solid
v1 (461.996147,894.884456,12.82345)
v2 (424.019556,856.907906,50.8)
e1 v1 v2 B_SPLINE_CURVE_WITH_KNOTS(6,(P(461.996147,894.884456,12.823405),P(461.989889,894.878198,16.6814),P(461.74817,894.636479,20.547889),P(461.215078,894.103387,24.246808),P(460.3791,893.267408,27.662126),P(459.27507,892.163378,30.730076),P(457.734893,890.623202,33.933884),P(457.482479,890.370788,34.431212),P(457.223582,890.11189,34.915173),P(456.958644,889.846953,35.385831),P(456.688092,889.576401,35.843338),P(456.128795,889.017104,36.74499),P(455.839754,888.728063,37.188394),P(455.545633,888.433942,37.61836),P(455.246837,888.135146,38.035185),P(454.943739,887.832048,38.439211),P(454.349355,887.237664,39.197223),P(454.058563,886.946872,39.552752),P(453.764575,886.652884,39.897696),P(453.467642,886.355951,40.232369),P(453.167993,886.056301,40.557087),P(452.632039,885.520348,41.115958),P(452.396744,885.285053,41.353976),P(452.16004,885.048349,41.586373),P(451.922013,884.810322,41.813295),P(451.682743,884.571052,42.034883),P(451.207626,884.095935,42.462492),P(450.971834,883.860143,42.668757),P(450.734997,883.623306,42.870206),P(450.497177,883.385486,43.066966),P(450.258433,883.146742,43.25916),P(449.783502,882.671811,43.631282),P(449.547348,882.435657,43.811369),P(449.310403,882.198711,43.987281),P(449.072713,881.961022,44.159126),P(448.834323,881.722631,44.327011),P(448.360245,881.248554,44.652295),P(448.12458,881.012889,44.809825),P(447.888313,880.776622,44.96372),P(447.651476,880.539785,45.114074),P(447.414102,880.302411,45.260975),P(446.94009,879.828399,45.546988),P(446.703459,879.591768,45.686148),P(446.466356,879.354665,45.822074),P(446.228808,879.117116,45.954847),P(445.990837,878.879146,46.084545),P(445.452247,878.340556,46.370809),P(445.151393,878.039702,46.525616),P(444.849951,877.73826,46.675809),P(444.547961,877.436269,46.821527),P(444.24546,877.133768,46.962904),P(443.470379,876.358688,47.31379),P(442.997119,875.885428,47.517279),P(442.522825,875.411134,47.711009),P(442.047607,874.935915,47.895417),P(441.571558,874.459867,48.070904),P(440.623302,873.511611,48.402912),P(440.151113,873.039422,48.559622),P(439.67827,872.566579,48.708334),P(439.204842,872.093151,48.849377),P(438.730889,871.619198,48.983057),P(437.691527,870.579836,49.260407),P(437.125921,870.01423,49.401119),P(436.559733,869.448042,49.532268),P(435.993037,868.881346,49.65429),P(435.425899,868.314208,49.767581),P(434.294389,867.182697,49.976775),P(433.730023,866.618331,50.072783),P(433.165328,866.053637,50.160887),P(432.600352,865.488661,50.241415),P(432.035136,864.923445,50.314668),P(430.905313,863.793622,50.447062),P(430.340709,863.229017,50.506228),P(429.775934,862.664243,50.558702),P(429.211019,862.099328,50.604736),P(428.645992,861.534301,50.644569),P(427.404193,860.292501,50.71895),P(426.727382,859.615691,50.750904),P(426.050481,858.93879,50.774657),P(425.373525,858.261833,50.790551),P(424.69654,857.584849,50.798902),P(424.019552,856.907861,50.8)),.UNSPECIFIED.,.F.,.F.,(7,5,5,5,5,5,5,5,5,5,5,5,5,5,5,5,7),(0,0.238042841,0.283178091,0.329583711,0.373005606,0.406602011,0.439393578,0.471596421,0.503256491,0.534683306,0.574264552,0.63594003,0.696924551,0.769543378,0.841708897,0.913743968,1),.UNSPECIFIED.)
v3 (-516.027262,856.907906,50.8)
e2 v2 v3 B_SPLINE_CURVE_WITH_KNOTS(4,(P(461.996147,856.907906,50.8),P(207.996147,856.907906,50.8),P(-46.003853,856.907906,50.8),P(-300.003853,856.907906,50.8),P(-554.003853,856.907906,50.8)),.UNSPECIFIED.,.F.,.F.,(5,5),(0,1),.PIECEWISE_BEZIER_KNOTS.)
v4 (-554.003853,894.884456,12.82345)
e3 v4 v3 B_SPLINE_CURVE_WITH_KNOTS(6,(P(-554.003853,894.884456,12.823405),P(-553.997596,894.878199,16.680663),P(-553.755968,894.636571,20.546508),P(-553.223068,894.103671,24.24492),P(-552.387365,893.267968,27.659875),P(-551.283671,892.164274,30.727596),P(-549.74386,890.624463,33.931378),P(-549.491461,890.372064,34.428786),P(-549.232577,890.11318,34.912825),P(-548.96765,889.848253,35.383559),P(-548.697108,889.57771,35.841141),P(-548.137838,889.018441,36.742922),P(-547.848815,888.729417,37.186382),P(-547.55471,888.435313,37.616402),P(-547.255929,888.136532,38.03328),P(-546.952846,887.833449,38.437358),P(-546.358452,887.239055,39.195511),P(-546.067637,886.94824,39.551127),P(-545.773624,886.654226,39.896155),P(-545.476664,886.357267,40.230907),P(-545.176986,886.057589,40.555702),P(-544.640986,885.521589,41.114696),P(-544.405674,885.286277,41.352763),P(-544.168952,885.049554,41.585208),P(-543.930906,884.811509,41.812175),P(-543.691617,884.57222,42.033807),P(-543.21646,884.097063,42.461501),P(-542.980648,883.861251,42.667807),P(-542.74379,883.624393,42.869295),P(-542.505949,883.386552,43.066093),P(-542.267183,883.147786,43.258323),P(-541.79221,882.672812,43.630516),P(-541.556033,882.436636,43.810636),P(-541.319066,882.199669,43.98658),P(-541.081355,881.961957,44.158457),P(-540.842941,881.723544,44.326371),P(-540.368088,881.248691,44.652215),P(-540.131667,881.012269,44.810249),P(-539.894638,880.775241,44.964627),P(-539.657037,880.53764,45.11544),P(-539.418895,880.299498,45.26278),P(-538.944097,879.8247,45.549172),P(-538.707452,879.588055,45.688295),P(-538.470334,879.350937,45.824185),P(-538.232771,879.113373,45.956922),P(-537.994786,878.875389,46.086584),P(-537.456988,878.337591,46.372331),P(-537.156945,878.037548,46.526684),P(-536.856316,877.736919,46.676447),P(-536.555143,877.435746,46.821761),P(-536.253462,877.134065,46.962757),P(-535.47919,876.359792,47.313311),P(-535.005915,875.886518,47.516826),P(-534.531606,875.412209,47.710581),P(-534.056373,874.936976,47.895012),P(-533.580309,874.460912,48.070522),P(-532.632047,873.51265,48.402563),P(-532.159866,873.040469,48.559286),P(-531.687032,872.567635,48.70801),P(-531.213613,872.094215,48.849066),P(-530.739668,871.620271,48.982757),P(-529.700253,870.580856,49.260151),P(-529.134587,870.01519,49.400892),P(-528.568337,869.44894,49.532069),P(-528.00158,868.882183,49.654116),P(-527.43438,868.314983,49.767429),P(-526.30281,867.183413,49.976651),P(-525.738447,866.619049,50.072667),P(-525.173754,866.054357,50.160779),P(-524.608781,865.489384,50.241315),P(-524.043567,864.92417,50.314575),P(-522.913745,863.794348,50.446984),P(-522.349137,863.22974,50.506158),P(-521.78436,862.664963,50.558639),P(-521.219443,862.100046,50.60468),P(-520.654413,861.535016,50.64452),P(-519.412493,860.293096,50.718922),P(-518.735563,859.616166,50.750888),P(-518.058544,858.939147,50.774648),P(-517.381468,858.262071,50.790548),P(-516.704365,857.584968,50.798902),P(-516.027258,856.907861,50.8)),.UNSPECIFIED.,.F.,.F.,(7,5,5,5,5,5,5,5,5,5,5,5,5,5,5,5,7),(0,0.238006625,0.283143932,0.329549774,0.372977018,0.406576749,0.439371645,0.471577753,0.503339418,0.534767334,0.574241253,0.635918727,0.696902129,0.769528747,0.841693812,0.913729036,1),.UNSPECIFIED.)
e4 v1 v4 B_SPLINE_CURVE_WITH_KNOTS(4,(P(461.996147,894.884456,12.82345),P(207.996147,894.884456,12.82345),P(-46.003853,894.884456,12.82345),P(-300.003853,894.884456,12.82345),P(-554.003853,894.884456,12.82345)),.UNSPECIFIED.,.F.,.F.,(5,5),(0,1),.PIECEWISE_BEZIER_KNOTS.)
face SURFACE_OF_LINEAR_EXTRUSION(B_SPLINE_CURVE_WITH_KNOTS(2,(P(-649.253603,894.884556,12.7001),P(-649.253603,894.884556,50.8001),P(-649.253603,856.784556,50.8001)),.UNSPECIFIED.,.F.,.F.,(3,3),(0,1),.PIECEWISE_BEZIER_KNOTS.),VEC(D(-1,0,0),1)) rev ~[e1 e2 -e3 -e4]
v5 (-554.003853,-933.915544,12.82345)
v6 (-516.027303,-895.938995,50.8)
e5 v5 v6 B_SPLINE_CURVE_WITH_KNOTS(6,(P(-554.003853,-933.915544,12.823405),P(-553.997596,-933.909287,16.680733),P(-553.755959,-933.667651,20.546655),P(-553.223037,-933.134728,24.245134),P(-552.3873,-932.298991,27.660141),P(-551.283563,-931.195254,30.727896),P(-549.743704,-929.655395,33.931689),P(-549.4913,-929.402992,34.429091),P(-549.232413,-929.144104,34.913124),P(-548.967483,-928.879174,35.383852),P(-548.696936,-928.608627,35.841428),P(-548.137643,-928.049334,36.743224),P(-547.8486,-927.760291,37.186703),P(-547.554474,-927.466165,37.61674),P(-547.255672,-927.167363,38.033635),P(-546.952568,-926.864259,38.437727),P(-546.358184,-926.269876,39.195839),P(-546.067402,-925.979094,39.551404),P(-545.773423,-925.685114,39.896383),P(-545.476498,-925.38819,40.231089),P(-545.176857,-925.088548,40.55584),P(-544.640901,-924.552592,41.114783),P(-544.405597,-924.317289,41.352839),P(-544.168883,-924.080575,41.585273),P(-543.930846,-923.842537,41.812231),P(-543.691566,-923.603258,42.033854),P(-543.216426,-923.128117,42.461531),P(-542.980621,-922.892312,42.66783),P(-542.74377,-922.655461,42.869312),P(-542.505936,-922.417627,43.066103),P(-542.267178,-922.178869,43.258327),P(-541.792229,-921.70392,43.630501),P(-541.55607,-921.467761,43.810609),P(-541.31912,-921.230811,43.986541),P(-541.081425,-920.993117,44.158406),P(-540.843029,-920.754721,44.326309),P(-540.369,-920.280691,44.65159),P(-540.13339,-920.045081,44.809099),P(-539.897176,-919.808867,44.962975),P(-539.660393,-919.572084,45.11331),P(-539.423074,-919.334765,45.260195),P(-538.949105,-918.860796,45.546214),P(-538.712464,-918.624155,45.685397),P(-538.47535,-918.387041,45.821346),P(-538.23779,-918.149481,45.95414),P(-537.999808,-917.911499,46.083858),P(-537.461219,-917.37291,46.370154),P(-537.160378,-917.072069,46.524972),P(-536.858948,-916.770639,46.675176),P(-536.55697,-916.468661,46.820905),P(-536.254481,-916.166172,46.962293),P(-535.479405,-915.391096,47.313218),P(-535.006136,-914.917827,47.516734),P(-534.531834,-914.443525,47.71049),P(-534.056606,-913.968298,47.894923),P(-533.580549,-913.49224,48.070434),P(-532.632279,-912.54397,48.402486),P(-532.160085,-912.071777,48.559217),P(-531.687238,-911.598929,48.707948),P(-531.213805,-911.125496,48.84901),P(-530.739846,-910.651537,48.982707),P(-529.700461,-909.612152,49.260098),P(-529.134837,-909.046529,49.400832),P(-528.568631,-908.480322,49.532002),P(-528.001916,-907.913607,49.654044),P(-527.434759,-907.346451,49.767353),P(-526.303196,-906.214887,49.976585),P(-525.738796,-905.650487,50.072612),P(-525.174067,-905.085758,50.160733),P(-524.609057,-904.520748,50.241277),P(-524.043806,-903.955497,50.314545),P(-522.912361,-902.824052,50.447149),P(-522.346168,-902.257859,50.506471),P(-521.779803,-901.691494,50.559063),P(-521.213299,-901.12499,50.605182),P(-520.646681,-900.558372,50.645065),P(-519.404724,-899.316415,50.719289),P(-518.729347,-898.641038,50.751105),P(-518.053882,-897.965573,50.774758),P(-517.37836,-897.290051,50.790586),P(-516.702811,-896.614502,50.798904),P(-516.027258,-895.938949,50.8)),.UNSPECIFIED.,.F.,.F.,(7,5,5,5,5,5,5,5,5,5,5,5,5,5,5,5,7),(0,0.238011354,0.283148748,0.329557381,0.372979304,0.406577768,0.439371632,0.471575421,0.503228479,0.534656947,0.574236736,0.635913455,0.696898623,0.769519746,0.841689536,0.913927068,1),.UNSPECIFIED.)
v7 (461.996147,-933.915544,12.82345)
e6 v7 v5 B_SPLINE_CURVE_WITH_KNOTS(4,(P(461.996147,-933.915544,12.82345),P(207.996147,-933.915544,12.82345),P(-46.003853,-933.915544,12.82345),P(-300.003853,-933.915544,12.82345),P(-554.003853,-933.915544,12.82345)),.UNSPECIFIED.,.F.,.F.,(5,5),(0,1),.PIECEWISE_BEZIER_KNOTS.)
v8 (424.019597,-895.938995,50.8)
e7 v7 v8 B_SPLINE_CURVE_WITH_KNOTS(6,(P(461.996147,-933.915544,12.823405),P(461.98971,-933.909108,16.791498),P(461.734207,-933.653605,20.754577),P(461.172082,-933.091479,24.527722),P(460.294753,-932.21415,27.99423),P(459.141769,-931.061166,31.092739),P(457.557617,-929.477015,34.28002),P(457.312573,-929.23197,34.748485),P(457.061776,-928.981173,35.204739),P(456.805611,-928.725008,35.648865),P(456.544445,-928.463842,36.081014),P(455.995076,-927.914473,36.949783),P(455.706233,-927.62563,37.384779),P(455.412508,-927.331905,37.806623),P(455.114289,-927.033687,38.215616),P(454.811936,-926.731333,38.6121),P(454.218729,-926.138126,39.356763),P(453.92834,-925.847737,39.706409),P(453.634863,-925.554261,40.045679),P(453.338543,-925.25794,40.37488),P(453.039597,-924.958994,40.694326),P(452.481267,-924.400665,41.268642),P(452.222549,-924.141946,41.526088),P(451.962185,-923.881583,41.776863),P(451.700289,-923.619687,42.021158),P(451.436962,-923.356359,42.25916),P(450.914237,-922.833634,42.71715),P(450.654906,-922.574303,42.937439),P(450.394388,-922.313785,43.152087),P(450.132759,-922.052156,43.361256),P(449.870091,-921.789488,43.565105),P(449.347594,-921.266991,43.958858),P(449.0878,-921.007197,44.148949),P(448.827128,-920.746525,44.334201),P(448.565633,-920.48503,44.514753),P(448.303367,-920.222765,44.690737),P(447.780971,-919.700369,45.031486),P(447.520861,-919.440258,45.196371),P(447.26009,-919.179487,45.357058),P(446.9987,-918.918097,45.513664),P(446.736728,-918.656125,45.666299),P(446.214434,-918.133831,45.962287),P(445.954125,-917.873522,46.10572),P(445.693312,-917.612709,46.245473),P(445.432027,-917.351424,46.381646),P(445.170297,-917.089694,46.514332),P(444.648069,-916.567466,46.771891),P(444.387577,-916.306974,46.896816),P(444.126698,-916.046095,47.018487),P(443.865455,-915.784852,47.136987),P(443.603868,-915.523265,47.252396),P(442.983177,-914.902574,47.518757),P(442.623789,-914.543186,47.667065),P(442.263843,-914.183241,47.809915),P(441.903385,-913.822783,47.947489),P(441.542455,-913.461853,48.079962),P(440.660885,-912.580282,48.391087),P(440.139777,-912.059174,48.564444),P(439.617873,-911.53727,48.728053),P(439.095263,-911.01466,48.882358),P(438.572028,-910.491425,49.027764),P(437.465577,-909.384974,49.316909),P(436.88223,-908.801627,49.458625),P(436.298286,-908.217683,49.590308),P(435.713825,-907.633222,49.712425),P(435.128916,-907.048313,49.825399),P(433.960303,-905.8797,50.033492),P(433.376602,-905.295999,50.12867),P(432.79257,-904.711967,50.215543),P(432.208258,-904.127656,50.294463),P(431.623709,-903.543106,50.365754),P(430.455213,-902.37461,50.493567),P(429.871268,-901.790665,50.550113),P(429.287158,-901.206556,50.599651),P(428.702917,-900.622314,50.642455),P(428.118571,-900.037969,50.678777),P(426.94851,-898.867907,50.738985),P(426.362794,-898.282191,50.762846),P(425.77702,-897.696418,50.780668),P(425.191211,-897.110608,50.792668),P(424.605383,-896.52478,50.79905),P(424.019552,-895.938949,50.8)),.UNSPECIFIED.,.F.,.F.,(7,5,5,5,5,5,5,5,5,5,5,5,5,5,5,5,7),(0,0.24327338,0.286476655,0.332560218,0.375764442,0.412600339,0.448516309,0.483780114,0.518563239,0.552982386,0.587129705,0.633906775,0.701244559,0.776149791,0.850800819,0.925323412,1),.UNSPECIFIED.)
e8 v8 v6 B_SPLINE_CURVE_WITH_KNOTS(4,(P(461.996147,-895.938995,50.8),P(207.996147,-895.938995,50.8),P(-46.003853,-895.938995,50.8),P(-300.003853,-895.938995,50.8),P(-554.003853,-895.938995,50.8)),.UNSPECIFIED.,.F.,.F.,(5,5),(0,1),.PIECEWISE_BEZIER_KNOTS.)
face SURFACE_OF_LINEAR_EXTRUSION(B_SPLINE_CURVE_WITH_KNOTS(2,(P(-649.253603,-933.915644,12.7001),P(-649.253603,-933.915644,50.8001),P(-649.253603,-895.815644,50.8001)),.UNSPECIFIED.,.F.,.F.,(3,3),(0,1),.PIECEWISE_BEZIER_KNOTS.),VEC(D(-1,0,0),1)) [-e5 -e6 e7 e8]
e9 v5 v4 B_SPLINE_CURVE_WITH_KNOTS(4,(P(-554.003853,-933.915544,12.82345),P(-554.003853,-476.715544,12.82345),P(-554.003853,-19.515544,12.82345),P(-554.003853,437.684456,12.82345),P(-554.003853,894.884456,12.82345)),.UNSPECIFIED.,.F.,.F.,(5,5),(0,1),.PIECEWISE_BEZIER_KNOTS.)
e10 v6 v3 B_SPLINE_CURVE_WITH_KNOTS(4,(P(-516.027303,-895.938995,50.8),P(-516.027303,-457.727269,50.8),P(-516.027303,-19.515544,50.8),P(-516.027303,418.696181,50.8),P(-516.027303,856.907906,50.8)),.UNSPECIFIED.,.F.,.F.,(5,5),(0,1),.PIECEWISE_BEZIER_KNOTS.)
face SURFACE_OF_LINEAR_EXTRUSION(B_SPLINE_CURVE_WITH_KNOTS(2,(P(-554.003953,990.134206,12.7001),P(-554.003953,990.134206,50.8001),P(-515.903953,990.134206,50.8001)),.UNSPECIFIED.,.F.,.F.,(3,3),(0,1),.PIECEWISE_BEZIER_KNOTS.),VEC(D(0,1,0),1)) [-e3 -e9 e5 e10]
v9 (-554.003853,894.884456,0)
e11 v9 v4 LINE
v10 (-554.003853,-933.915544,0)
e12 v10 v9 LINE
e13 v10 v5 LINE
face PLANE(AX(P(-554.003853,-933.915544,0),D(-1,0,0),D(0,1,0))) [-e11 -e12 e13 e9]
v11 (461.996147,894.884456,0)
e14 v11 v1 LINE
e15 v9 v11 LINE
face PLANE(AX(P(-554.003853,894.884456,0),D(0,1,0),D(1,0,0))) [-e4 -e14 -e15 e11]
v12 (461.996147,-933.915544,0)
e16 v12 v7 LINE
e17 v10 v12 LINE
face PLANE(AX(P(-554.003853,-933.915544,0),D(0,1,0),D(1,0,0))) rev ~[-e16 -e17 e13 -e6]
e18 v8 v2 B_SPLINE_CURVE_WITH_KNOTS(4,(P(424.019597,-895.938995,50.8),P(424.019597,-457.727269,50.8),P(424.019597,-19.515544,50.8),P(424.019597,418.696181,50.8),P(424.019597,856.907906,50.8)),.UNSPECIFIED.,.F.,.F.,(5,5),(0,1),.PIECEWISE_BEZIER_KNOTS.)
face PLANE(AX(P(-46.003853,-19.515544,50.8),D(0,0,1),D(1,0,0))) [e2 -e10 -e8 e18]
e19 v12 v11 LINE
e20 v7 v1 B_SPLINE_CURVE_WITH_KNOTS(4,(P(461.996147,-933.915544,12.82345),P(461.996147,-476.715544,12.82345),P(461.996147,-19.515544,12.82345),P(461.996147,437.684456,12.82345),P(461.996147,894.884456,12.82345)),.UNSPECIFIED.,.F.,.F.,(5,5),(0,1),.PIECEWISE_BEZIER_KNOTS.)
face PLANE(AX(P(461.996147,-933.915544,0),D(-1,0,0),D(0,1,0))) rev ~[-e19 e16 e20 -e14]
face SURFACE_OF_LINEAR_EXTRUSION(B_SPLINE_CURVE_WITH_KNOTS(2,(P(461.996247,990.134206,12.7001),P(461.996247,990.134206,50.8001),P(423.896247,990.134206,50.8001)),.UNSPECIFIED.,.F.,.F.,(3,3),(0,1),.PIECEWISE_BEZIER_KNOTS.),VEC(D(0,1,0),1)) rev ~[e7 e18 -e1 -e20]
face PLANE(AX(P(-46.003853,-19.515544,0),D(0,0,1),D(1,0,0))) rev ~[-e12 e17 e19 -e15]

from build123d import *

# Parameters (mm, degrees)
F0_W        = 1016
F0_H        = 1828.8
F1_DEPTH    = 50.8
F2_T1_DEPTH = 1206.4995000007
F2_T3_DEPTH = 2019.2995000007


# Not quite as in the source:
# - a fillet or chamfer that OpenCascade refuses, or shapes differently, is made with other operations: its cross-section is extruded or revolved along the edge and cut away or added


with BuildPart() as f1:
    # F0 (on Top) → F1 (new body)
    with BuildSketch(Plane.XY):
        with Locations((-46.0038529815, -19.5155441761)):
            Rectangle(F0_W, F0_H)
    extrude(amount=F1_DEPTH)

    # F2: fillet of radius 38.1 on 4 edges, made by hand

    # F2_s2 → F2_t1 (cut)
    with BuildSketch(Plane.YZ.offset(-649.2536029818)):
        with BuildLine():
            add(Edge.make_bspline(
                [(-933.9156441761, 12.7001), (-933.9156441761, 50.8001), (-895.8156441761, 50.8001)],
                knots=[0, 0, 0, 1, 1, 1], degree=2, weights=[1, 1, 1]))
            Line((-895.8156441761, 50.8001), (-895.8156441761, 51.5621))
            ThreePointArc((-895.8156441761, 51.5621), (-914.8655941761, 51.562), (-933.9155441761, 51.562))
            Line((-933.9155441761, 51.562), (-934.6775441761, 50.8))
            ThreePointArc((-934.6775441761, 50.8), (-934.6775441761, 31.75005), (-934.6776441761, 12.7001))
            Line((-934.6776441761, 12.7001), (-933.9156441761, 12.7001))
        make_face()
        with BuildLine():
            add(Edge.make_bspline(
                [(894.8845558239, 12.7001), (894.8845558239, 50.8001), (856.7845558239, 50.8001)],
                knots=[0, 0, 0, 1, 1, 1], degree=2, weights=[1, 1, 1]))
            Line((856.7845558239, 50.8001), (856.7845558239, 51.5621))
            ThreePointArc((856.7845558239, 51.5621), (875.8345058239, 51.562), (894.8844558239, 51.562))
            Line((894.8844558239, 51.562), (895.6464558239, 50.8))
            ThreePointArc((895.6464558239, 50.8), (895.6464558239, 31.75005), (895.6465558239, 12.7001))
            Line((895.6465558239, 12.7001), (894.8845558239, 12.7001))
        make_face()
    extrude(amount=F2_T1_DEPTH, mode=Mode.SUBTRACT)

    # F2_s4 → F2_t3 (cut)
    with BuildSketch(Plane.XZ.offset(-990.1342058242)):
        with BuildLine():
            add(Edge.make_bspline(
                [(461.9962470185, 12.7001), (461.9962470185, 50.8001), (423.8962470185, 50.8001)],
                knots=[0, 0, 0, 1, 1, 1], degree=2, weights=[1, 1, 1]))
            Line((423.8962470185, 50.8001), (423.8962470185, 51.5621))
            ThreePointArc((423.8962470185, 51.5621), (442.9461970185, 51.562), (461.9961470185, 51.562))
            Line((461.9961470185, 51.562), (462.7581470185, 50.8))
            ThreePointArc((462.7581470185, 50.8), (462.7581470185, 31.75005), (462.7582470185, 12.7001))
            Line((462.7582470185, 12.7001), (461.9962470185, 12.7001))
        make_face()
        with BuildLine():
            add(Edge.make_bspline(
                [(-554.0039529815, 12.7001), (-554.0039529815, 50.8001), (-515.9039529815, 50.8001)],
                knots=[0, 0, 0, 1, 1, 1], degree=2, weights=[1, 1, 1]))
            Line((-515.9039529815, 50.8001), (-515.9039529815, 51.5621))
            ThreePointArc((-515.9039529815, 51.5621), (-534.9539029815, 51.562), (-554.0038529815, 51.562))
            Line((-554.0038529815, 51.562), (-554.7658529815, 50.8))
            ThreePointArc((-554.7658529815, 50.8), (-554.7658529815, 31.75005), (-554.7659529815, 12.7001))
            Line((-554.7659529815, 12.7001), (-554.0039529815, 12.7001))
        make_face()
    extrude(amount=F2_T3_DEPTH, mode=Mode.SUBTRACT)


solid = f1.part
